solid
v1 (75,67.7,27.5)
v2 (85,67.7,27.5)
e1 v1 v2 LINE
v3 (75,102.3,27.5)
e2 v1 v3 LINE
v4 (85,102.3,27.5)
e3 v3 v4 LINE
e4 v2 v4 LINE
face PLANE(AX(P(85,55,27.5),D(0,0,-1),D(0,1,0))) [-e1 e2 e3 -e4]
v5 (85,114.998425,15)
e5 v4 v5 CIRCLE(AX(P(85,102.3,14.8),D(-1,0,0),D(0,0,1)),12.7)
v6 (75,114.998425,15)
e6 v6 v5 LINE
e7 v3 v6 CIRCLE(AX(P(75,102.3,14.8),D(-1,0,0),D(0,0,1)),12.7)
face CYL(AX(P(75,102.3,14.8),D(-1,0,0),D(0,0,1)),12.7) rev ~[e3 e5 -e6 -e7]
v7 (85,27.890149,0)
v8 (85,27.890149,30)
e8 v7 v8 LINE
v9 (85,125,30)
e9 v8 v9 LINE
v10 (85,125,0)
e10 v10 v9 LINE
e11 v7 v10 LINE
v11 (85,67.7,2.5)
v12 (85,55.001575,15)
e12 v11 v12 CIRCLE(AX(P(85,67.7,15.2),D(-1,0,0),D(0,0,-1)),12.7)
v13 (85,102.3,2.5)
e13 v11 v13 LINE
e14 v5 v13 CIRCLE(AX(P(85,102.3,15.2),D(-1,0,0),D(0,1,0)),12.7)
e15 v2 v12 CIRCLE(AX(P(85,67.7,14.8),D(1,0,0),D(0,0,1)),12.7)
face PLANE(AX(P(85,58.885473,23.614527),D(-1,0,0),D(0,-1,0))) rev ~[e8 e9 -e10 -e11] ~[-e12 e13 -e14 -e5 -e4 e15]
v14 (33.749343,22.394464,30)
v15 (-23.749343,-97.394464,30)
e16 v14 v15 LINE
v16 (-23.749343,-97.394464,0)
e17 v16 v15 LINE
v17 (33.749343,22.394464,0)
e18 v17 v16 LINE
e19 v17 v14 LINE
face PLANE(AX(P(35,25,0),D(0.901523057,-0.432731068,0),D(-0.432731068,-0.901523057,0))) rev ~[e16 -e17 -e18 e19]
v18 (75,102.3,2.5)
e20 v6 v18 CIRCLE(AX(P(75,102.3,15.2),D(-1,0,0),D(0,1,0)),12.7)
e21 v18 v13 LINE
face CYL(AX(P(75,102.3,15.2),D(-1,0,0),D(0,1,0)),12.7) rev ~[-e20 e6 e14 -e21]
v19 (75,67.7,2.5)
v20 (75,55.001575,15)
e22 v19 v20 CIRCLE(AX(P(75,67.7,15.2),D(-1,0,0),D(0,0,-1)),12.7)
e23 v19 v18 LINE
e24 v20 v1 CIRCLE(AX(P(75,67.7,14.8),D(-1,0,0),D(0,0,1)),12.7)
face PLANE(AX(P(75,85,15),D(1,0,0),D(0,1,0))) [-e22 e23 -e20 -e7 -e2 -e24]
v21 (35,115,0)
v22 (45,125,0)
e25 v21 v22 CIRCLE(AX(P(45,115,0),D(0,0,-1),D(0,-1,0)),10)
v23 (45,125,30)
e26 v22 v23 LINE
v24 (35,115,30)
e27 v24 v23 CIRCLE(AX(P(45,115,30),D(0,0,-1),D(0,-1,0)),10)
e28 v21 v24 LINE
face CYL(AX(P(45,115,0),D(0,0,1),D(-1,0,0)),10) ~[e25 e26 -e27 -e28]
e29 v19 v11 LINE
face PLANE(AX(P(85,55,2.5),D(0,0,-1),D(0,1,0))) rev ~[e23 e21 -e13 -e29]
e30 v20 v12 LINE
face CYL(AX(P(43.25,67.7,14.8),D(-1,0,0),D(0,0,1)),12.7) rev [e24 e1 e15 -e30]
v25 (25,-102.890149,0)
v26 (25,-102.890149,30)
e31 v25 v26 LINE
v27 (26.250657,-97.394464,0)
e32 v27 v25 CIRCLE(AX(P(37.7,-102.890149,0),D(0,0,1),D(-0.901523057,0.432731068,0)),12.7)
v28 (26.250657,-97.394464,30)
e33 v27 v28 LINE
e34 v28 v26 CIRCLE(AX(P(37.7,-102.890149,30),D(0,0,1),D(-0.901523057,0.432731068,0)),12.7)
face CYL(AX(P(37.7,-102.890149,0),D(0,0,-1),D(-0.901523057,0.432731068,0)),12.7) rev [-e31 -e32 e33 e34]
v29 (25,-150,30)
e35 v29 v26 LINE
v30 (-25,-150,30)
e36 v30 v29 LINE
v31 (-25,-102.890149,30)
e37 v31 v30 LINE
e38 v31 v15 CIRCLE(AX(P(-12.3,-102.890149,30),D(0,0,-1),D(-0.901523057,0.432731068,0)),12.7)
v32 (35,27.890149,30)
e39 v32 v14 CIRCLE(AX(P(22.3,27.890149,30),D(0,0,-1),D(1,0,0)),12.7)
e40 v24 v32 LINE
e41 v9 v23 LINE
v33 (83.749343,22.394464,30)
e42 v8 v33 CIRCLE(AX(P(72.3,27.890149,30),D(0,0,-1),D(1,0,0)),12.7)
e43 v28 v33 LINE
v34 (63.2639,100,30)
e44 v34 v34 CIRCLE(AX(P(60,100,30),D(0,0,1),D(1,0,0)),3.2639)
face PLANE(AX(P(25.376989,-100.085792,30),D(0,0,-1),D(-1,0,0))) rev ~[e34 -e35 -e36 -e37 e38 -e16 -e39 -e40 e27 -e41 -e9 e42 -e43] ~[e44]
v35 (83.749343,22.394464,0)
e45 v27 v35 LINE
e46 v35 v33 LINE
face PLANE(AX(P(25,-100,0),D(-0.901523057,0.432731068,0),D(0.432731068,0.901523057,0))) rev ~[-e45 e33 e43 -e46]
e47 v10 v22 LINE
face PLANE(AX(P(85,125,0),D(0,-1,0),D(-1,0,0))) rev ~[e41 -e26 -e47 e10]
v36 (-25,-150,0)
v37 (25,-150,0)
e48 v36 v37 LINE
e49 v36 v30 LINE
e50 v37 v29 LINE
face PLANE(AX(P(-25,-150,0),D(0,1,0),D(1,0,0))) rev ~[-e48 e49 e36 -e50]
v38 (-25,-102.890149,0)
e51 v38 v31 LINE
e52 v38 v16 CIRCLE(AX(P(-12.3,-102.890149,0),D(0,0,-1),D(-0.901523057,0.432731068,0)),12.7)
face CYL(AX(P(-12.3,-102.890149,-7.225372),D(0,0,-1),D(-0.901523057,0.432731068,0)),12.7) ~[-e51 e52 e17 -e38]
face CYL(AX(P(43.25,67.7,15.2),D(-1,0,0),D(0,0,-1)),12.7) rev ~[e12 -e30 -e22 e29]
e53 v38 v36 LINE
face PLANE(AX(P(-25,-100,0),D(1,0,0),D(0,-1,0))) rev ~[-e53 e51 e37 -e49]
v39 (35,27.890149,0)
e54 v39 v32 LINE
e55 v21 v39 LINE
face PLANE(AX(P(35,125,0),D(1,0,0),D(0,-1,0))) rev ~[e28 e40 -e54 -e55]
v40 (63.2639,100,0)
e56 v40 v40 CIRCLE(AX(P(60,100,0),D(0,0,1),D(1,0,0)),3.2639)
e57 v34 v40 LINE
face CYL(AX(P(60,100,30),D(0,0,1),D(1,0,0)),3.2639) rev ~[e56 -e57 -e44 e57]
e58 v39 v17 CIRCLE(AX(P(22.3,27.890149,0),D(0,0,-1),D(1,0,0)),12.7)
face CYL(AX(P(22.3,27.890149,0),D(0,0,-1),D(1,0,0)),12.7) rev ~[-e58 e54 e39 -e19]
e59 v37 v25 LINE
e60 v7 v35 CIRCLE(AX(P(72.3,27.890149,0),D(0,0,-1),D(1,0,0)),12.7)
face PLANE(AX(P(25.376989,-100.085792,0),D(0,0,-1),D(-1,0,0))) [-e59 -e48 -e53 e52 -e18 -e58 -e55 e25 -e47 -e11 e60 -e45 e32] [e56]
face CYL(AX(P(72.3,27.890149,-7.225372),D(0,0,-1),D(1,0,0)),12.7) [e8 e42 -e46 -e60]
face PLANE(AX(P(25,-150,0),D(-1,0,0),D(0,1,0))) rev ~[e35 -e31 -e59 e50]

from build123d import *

# Parameters (mm, degrees)
F1_DEPTH    = 30
F2_W        = 60
F2_H        = 25
F3_DEPTH    = 10
F4_R        = 10
F5_R        = 3.2639
F6_DEPTH    = 30.001
F7_T1_DEPTH = 30
F7_T3_DEPTH = 10
F7_T5_DEPTH = 41.75
F7_T7_DEPTH = 44.4507439359


# Not quite as in the source:
# - a fillet or chamfer that OpenCascade refuses, or shapes differently, is made with other operations: its cross-section is extruded or revolved along the edge and cut away or added


with BuildPart() as f1:
    # F0 (on Top) → F1 (new body)
    with BuildSketch(Plane.XY):
        Polygon((-25, -100), (-25, -150), (25, -150), (25, -100), (85, 25), (85, 125), (35, 125), (35, 25), align=None)
    extrude(amount=F1_DEPTH)

    # F2 (on face) → F3 (cut)
    with BuildSketch(Plane.YZ.offset(85)):
        with Locations((85, 15)):
            Rectangle(F2_W, F2_H)
    extrude(amount=-F3_DEPTH, mode=Mode.SUBTRACT)

    # F4
    f4_edges = [f1.edges().sort_by_distance(p)[0] for p in [
        (35, 125, 15),
    ]]
    fillet(f4_edges, radius=F4_R)

    # F5 (on face) → F6 (cut, through all)
    with BuildSketch(Plane.XY.offset(30)):
        with Locations((60, 100)):
            Circle(F5_R)
    extrude(amount=-F6_DEPTH, mode=Mode.SUBTRACT)

    # F7: fillet of radius 12.7 on 8 edges, made by hand

    # F7_s2 → F7_t1 (join)
    with BuildSketch(Plane.XY):
        with BuildLine():
            ThreePointArc((26.2506571702, -97.3944642288), (25.3166108448, -100.0720513739), (25, -102.8901487872))
            Line((25, -102.8901487872), (25, -100))
            Line((25, -100), (26.2506571702, -97.3944642288))
        make_face()
        with BuildLine():
            ThreePointArc((35, 27.8901487872), (34.6833891552, 25.0720513739), (33.7493428298, 22.3944642288))
            Line((33.7493428298, 22.3944642288), (35, 25))
            Line((35, 25), (35, 27.8901487872))
        make_face()
    extrude(amount=F7_T1_DEPTH)

    # F7_s4 → F7_t3 (join)
    with BuildSketch(Plane.YZ.offset(75)):
        with BuildLine():
            ThreePointArc((102.3, 27.5), (111.2802561211, 23.7802561211), (115, 14.8))
            Line((115, 14.8), (115, 27.5))
            Line((115, 27.5), (102.3, 27.5))
        make_face()
        with BuildLine():
            ThreePointArc((115, 15.2), (111.2802561211, 6.2197438789), (102.3, 2.5))
            Line((102.3, 2.5), (115, 2.5))
            Line((115, 2.5), (115, 15.2))
        make_face()
    extrude(amount=F7_T3_DEPTH)

    # F7_s6 → F7_t5 (join)
    with BuildSketch(Plane.YZ.offset(43.25)):
        with BuildLine():
            ThreePointArc((67.7, 27.5), (58.7197438789, 23.7802561211), (55, 14.8))
            Line((55, 14.8), (55, 27.5))
            Line((55, 27.5), (67.7, 27.5))
        make_face()
        with BuildLine():
            ThreePointArc((67.7, 2.5), (58.7197438789, 6.2197438789), (55, 15.2))
            Line((55, 15.2), (55, 2.5))
            Line((55, 2.5), (67.7, 2.5))
        make_face()
    extrude(amount=F7_T5_DEPTH)

    # F7_s8 → F7_t7 (cut)
    with BuildSketch(Plane.XY.offset(-7.2253719679)):
        with BuildLine():
            ThreePointArc((85, 27.8901487872), (84.6833891552, 25.0720513739), (83.7493428298, 22.3944642288))
            Line((83.7493428298, 22.3944642288), (85, 25))
            Line((85, 25), (85, 27.8901487872))
        make_face()
        with BuildLine():
            ThreePointArc((-23.7493428298, -97.3944642288), (-24.6833891552, -100.0720513739), (-25, -102.8901487872))
            Line((-25, -102.8901487872), (-25, -100))
            Line((-25, -100), (-23.7493428298, -97.3944642288))
        make_face()
    extrude(amount=F7_T7_DEPTH, mode=Mode.SUBTRACT)


solid = f1.part
